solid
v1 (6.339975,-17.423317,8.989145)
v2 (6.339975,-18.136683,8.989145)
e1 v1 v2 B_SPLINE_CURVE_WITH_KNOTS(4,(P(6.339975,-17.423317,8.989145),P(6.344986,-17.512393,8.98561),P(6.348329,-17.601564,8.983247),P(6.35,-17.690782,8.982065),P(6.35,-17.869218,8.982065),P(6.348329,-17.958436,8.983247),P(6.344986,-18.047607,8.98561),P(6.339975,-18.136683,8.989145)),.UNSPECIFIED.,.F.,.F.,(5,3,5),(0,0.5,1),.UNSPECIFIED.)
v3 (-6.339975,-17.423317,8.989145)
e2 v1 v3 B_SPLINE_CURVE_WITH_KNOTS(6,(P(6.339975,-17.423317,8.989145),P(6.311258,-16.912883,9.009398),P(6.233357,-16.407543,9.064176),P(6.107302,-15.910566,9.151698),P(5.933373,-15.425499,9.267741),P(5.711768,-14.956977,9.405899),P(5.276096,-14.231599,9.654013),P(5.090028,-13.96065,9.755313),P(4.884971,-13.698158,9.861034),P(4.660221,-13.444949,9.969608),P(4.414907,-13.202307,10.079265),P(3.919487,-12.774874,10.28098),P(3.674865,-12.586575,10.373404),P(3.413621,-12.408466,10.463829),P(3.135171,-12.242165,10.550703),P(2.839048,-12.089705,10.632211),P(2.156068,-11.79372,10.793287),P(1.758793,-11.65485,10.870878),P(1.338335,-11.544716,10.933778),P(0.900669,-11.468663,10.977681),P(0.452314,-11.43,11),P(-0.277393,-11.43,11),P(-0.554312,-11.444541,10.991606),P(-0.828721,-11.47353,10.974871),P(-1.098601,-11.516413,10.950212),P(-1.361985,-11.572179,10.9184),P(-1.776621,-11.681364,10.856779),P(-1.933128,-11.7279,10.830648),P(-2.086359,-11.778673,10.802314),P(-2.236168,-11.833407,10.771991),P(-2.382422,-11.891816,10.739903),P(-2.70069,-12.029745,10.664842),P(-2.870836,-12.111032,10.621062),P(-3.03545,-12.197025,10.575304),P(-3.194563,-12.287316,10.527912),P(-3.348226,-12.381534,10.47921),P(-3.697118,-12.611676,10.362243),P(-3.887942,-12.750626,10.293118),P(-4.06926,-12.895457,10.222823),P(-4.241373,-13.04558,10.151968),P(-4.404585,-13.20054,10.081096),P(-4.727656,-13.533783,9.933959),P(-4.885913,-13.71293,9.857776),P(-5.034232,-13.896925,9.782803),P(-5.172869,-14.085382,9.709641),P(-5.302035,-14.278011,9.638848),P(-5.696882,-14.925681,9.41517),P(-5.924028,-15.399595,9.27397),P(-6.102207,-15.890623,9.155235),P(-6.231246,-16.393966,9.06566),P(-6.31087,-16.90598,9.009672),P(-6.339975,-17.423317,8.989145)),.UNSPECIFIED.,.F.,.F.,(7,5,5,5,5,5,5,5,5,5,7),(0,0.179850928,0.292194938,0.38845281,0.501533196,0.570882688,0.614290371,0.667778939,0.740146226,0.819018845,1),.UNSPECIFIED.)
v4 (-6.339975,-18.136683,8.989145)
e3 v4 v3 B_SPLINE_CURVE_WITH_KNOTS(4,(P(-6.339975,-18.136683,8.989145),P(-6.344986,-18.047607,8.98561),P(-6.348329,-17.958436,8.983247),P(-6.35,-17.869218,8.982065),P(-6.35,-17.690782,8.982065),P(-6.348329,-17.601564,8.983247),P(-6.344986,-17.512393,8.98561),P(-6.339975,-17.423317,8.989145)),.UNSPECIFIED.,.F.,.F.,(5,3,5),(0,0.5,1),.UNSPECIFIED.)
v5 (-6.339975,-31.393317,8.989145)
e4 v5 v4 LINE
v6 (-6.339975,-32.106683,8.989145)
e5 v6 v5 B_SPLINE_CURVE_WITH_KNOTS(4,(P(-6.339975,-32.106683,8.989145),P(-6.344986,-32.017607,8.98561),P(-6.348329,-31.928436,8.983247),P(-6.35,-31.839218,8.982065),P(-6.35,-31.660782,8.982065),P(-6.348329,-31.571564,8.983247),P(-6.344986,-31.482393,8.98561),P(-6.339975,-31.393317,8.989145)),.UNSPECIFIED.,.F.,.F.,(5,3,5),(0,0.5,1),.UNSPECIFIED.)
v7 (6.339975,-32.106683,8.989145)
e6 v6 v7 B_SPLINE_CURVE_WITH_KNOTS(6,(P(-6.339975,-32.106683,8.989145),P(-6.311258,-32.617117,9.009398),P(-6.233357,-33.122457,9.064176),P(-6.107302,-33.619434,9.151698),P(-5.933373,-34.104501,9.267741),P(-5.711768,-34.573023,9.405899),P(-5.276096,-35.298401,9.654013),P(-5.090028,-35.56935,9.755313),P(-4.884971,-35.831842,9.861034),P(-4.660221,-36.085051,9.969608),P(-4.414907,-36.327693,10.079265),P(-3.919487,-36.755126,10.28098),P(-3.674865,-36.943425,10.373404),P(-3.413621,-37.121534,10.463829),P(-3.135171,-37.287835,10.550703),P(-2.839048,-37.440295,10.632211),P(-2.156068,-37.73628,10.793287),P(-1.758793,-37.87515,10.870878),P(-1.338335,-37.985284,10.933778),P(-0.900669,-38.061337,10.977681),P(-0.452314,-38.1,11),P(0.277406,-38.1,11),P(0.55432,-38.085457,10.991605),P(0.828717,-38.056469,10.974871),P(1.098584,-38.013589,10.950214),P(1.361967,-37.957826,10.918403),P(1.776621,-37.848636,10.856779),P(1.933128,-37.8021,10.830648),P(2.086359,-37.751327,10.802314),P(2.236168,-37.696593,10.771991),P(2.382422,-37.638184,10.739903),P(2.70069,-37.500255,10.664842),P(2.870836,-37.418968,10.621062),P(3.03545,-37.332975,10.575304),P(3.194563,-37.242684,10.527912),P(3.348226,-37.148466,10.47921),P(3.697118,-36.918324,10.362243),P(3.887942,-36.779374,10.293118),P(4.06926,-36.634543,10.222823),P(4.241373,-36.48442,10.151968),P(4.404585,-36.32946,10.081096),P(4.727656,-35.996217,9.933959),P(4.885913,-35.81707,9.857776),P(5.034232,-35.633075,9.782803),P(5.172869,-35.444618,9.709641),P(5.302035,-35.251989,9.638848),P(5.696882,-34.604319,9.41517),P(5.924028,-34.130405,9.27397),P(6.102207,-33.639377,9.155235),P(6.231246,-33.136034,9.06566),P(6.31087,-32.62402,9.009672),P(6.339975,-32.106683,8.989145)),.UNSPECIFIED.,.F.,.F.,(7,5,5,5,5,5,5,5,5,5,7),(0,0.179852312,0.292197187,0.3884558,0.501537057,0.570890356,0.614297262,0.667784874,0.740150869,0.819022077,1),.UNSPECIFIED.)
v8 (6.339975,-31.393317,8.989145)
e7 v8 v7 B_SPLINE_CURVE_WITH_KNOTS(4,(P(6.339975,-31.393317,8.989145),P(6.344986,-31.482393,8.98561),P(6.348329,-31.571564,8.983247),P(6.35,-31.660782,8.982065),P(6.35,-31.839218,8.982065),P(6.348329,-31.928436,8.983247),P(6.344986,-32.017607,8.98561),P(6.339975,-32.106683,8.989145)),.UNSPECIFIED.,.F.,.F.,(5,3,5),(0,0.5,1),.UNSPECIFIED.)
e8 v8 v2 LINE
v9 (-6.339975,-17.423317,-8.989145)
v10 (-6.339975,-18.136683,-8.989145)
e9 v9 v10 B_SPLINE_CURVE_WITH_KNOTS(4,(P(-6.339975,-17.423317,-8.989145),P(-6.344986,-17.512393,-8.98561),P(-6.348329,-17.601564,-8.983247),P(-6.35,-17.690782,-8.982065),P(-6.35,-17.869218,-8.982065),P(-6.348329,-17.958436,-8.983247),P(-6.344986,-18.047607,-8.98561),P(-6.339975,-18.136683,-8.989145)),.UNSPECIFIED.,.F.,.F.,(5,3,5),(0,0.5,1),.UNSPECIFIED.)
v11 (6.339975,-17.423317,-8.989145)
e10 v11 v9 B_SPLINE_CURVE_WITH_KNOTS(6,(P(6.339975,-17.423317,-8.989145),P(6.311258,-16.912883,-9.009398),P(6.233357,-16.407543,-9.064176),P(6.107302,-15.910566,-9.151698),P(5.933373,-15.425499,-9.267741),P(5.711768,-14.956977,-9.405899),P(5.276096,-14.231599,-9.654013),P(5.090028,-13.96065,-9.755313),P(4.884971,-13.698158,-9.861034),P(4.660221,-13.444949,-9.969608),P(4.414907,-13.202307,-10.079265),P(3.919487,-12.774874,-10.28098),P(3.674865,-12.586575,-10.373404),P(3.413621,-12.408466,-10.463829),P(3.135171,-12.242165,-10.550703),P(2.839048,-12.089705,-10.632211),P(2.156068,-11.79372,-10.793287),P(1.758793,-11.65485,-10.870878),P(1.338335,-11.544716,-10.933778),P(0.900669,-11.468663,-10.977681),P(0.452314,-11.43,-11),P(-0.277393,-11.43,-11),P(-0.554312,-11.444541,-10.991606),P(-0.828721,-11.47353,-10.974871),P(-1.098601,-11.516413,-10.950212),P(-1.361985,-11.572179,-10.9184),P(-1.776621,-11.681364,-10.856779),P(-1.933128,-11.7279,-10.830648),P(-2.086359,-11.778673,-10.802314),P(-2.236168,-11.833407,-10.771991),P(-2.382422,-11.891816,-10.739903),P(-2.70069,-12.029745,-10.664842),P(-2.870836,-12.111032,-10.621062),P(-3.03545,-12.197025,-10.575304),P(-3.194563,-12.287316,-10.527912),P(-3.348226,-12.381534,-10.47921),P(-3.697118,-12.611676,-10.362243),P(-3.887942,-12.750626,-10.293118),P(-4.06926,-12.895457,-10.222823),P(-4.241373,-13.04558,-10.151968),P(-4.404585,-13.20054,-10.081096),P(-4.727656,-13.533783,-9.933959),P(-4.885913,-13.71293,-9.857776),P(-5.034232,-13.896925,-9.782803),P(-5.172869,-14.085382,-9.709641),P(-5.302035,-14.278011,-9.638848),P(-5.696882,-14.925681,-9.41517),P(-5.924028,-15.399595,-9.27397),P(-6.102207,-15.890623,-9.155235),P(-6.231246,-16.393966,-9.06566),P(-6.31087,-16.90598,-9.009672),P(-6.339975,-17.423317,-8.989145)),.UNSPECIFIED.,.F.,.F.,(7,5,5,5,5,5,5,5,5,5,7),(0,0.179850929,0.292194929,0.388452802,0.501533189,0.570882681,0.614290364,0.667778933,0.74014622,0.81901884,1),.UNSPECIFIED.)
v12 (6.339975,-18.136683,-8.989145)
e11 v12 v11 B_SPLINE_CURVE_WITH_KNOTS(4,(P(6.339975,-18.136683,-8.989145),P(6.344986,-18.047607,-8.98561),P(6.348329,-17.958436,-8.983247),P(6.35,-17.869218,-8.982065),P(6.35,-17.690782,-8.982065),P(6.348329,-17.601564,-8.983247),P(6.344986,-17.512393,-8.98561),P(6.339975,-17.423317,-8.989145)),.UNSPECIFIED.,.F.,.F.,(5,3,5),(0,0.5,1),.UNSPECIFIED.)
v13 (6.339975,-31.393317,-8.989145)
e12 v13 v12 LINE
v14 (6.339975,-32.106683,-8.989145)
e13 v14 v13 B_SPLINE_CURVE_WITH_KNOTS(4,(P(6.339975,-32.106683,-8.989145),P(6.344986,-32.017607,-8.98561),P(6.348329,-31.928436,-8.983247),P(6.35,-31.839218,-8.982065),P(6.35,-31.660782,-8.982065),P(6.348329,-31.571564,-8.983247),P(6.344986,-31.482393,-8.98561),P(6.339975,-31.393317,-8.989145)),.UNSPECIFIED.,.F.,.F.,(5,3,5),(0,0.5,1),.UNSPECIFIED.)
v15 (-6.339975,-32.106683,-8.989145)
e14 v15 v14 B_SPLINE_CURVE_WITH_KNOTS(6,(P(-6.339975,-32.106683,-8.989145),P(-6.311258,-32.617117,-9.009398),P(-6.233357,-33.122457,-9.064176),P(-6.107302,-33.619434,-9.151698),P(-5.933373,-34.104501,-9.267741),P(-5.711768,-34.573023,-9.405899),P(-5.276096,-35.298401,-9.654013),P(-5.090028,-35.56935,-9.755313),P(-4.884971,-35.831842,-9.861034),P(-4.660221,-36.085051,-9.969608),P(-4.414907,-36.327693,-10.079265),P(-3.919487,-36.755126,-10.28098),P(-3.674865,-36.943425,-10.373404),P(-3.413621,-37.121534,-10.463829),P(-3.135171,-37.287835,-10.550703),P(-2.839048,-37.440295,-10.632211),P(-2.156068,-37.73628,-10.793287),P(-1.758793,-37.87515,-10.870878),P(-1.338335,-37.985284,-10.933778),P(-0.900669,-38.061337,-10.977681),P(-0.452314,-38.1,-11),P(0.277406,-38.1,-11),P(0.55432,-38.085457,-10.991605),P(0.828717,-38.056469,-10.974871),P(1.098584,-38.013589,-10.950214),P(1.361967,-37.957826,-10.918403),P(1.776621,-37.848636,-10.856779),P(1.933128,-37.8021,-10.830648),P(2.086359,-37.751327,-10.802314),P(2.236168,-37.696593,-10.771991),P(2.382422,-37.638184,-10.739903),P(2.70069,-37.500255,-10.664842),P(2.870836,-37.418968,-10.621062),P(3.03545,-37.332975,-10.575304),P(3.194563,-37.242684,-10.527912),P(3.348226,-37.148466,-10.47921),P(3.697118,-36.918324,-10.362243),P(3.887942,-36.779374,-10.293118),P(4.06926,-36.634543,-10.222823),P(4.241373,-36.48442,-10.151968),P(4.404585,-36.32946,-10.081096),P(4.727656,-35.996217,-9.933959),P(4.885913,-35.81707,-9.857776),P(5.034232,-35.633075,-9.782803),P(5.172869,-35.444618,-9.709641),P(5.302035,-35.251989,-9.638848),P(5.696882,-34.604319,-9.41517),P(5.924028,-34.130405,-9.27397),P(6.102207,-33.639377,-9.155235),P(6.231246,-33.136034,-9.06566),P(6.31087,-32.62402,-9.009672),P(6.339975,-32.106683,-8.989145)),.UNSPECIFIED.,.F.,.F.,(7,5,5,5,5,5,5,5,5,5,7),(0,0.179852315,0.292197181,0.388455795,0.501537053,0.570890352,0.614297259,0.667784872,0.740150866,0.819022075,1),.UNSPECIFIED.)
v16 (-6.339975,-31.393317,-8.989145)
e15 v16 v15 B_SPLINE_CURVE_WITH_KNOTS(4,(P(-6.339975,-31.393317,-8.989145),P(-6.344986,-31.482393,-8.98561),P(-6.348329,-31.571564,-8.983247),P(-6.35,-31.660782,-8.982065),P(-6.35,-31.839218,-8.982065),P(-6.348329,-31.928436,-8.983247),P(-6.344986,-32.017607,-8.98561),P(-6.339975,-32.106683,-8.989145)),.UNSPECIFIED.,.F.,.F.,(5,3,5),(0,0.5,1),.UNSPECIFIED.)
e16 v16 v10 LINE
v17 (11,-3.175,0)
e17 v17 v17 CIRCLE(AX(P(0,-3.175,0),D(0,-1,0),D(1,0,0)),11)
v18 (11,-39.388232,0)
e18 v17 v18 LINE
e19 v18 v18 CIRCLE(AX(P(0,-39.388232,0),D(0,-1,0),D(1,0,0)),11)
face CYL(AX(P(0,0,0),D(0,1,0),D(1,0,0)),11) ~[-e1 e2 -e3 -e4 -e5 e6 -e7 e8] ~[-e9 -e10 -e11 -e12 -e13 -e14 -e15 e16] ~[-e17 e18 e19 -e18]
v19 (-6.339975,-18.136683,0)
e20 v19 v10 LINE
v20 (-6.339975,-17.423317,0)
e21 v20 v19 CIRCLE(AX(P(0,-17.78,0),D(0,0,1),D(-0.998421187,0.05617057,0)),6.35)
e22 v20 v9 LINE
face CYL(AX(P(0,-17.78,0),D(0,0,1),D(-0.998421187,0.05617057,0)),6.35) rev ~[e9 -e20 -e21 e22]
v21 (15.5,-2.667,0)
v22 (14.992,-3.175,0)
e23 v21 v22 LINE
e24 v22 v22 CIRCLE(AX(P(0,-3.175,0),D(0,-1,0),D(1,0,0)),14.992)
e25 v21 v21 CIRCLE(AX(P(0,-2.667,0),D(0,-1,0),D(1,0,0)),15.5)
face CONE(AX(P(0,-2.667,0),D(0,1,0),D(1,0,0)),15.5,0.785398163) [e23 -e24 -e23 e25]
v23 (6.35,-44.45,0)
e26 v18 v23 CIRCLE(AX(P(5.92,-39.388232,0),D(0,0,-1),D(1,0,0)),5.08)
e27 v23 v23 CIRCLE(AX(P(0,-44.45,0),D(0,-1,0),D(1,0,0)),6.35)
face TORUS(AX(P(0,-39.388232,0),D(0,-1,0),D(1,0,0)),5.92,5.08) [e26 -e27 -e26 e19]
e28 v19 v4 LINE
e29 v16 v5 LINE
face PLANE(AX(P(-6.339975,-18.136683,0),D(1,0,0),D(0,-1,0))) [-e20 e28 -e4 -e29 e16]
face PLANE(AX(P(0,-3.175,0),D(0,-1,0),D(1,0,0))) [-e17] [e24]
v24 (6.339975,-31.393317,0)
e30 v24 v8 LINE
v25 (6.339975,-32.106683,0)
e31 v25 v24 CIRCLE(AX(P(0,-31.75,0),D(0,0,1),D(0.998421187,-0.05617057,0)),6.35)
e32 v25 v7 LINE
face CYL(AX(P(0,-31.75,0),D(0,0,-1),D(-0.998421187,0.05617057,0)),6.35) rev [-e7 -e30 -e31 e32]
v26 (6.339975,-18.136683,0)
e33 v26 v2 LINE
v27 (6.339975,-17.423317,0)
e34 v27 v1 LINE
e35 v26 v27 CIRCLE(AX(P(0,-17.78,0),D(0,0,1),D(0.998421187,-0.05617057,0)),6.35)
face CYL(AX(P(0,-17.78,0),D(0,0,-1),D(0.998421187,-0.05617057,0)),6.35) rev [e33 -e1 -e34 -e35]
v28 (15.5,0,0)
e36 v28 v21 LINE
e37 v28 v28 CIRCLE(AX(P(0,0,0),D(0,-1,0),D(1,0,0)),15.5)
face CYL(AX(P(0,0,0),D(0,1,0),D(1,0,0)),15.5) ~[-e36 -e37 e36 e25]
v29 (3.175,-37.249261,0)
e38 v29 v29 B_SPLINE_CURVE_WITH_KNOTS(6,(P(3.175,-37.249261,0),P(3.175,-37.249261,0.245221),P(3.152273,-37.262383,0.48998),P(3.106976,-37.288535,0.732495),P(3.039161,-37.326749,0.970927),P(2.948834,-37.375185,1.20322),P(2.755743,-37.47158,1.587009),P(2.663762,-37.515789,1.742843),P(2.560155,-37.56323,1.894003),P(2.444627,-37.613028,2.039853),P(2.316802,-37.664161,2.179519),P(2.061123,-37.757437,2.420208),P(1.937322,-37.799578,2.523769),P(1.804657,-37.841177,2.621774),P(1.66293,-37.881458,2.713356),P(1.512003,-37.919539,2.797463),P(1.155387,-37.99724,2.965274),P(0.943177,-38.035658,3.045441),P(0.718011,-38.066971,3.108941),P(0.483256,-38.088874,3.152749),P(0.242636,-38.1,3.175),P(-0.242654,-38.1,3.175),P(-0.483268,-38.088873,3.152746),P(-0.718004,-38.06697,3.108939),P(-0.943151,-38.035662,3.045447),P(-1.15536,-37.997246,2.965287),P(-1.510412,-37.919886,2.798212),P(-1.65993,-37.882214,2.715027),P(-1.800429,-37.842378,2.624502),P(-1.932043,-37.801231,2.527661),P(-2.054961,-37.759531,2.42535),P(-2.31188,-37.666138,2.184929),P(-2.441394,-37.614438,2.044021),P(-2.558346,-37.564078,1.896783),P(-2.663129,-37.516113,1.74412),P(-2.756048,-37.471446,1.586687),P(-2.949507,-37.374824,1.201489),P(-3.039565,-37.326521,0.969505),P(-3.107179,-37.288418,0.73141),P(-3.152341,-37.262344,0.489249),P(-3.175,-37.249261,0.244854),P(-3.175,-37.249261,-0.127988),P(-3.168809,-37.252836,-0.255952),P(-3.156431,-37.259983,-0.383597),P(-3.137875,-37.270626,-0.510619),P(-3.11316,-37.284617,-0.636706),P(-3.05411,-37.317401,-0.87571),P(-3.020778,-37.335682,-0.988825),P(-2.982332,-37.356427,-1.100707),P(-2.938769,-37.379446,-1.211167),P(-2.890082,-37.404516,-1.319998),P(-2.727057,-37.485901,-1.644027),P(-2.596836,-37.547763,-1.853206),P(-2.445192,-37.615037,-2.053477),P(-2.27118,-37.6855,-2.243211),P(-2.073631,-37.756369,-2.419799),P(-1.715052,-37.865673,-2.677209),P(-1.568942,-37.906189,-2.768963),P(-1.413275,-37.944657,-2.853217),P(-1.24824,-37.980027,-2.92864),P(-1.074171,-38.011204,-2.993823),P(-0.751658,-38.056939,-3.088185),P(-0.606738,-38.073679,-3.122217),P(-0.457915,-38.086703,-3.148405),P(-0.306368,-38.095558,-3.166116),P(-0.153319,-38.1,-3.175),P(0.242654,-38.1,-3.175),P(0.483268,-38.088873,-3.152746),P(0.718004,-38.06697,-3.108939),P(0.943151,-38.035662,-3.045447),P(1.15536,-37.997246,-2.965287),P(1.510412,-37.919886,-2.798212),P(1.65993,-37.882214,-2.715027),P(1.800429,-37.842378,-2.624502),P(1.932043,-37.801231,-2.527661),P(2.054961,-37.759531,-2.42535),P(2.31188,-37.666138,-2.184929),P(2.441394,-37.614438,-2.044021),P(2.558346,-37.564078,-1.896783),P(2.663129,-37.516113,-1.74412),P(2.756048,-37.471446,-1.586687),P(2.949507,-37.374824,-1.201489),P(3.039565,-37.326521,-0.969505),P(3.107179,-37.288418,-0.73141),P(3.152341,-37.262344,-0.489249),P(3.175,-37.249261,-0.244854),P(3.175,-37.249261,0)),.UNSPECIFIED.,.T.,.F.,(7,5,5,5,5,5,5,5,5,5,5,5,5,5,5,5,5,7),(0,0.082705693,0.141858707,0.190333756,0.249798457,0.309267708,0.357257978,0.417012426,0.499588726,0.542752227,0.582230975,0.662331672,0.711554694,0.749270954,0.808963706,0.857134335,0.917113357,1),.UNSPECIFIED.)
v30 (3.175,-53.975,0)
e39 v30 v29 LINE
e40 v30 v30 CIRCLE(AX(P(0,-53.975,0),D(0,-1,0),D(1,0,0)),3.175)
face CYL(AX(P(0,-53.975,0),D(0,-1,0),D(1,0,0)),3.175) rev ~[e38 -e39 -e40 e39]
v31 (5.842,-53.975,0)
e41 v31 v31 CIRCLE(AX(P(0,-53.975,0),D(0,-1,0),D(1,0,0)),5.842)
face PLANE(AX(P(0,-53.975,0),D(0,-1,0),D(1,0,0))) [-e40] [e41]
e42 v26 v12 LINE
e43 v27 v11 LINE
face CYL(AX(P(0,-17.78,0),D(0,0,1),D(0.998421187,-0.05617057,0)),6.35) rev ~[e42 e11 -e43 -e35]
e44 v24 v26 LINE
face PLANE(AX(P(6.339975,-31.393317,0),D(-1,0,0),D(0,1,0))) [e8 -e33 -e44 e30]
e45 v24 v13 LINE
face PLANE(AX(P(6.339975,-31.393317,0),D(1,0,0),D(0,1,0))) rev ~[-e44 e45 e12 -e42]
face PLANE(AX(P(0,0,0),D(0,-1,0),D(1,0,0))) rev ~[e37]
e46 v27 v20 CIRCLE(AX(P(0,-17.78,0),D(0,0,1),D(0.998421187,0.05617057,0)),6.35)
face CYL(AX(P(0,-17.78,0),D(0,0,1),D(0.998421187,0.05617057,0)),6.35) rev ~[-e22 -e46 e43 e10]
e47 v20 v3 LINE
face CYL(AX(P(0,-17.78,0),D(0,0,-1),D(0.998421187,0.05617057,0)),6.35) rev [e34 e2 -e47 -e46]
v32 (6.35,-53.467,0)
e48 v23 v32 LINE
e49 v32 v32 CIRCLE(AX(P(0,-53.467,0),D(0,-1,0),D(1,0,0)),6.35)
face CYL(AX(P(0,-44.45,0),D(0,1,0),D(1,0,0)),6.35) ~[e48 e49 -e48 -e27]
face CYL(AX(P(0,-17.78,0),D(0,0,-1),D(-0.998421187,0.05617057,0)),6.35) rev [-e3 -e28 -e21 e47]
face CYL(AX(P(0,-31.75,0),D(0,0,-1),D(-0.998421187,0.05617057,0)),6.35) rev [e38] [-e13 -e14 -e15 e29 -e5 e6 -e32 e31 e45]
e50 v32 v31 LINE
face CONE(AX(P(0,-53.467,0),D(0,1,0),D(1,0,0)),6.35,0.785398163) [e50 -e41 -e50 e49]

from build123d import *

# Parameters (mm, degrees)
F0_R          = 11
F1_DEPTH      = 44.45
F0_R_2        = 15.5
F2_DEPTH      = 3.175
F3_R          = 6.35
F4_DEPTH      = 9.525
F7_DEPTH      = 25.4
F7_DEPTH_BACK = 25.4
F8_R          = 3.175
F9_DEPTH      = 25.4
F10_SIZE      = 0.508


# Not quite as in the source:
# - a fillet or chamfer that OpenCascade refuses, or shapes differently, is made with other operations: its cross-section is extruded or revolved along the edge and cut away or added


with BuildPart() as f1:
    # F0 (on Front) → F1 (new body)
    with BuildSketch(Plane.XZ):
        Circle(F0_R)
    extrude(amount=F1_DEPTH)

    # F0 (on Front) → F2 (join)
    with BuildSketch(Plane.XZ):
        Circle(F0_R_2)
        Circle(F0_R, mode=Mode.SUBTRACT)
    extrude(amount=F2_DEPTH)

    # F3 (on face) → F4 (join)
    with BuildSketch(Plane.XZ.offset(44.45)):
        Circle(F3_R)
    extrude(amount=F4_DEPTH)

    # F5: fillet of radius 5.08 on 1 edges, made by hand

    # F5_s1 → F5_t2 (revolve, cut)
    with BuildSketch(Plane.XY):
        with BuildLine():
            ThreePointArc((11, -39.3882315343), (9.6610426354, -42.8249450807), (6.35, -44.45))
            Line((6.35, -44.45), (11, -44.45))
            Line((11, -44.45), (11, -39.3882315343))
        make_face()
    revolve(axis=Axis((0, -44.45, 0), (0, -1, 0)), mode=Mode.SUBTRACT)

    # F6 (on Top) → F7 (cut, two sides)
    with BuildSketch(Plane.XY) as f7_sk:
        with BuildLine():
            Line((-6.3399745388, -32.1066831191), (-6.3399745388, -31.3933168809))
            ThreePointArc((-6.3399745388, -31.3933168809), (-6.35, -31.75), (-6.3399745388, -32.1066831191))
        make_face()
        with BuildLine():
            Line((-6.3399745388, -18.1366831191), (-6.3399745388, -31.3933168809))
            Line((-6.3399745388, -31.3933168809), (-6.3399745388, -32.1066831191))
            ThreePointArc((-6.3399745388, -32.1066831191), (0, -38.1), (6.3399745388, -32.1066831191))
            Line((6.3399745388, -32.1066831191), (6.3399745388, -31.3933168809))
            Line((6.3399745388, -31.3933168809), (6.3399745388, -18.1366831191))
            Line((6.3399745388, -18.1366831191), (6.3399745388, -17.4233168809))
            ThreePointArc((6.3399745388, -17.4233168809), (0, -11.43), (-6.3399745388, -17.4233168809))
            Line((-6.3399745388, -17.4233168809), (-6.3399745388, -18.1366831191))
        make_face()
        with BuildLine():
            ThreePointArc((-6.3399745388, -17.4233168809), (-6.35, -17.78), (-6.3399745388, -18.1366831191))
            Line((-6.3399745388, -18.1366831191), (-6.3399745388, -17.4233168809))
        make_face()
        with BuildLine():
            Line((6.3399745388, -31.3933168809), (6.3399745388, -32.1066831191))
            ThreePointArc((6.3399745388, -32.1066831191), (6.35, -31.75), (6.3399745388, -31.3933168809))
        make_face()
        with BuildLine():
            ThreePointArc((6.3399745388, -18.1366831191), (6.35, -17.78), (6.3399745388, -17.4233168809))
            Line((6.3399745388, -17.4233168809), (6.3399745388, -18.1366831191))
        make_face()
    extrude(amount=-F7_DEPTH, mode=Mode.SUBTRACT)
    extrude(f7_sk.sketch, amount=F7_DEPTH_BACK, mode=Mode.SUBTRACT)

    # F8 (on face) → F9 (cut)
    with BuildSketch(Plane.XZ.offset(53.975)):
        Circle(F8_R)
    extrude(amount=-F9_DEPTH, mode=Mode.SUBTRACT)

    # F10
    f10_edges = [f1.edges().sort_by_distance(p)[0] for p in [
        (-15.5, -3.175, 0),
        (-6.35, -53.975, 0),
    ]]
    chamfer(f10_edges, length=F10_SIZE)


solid = f1.part
